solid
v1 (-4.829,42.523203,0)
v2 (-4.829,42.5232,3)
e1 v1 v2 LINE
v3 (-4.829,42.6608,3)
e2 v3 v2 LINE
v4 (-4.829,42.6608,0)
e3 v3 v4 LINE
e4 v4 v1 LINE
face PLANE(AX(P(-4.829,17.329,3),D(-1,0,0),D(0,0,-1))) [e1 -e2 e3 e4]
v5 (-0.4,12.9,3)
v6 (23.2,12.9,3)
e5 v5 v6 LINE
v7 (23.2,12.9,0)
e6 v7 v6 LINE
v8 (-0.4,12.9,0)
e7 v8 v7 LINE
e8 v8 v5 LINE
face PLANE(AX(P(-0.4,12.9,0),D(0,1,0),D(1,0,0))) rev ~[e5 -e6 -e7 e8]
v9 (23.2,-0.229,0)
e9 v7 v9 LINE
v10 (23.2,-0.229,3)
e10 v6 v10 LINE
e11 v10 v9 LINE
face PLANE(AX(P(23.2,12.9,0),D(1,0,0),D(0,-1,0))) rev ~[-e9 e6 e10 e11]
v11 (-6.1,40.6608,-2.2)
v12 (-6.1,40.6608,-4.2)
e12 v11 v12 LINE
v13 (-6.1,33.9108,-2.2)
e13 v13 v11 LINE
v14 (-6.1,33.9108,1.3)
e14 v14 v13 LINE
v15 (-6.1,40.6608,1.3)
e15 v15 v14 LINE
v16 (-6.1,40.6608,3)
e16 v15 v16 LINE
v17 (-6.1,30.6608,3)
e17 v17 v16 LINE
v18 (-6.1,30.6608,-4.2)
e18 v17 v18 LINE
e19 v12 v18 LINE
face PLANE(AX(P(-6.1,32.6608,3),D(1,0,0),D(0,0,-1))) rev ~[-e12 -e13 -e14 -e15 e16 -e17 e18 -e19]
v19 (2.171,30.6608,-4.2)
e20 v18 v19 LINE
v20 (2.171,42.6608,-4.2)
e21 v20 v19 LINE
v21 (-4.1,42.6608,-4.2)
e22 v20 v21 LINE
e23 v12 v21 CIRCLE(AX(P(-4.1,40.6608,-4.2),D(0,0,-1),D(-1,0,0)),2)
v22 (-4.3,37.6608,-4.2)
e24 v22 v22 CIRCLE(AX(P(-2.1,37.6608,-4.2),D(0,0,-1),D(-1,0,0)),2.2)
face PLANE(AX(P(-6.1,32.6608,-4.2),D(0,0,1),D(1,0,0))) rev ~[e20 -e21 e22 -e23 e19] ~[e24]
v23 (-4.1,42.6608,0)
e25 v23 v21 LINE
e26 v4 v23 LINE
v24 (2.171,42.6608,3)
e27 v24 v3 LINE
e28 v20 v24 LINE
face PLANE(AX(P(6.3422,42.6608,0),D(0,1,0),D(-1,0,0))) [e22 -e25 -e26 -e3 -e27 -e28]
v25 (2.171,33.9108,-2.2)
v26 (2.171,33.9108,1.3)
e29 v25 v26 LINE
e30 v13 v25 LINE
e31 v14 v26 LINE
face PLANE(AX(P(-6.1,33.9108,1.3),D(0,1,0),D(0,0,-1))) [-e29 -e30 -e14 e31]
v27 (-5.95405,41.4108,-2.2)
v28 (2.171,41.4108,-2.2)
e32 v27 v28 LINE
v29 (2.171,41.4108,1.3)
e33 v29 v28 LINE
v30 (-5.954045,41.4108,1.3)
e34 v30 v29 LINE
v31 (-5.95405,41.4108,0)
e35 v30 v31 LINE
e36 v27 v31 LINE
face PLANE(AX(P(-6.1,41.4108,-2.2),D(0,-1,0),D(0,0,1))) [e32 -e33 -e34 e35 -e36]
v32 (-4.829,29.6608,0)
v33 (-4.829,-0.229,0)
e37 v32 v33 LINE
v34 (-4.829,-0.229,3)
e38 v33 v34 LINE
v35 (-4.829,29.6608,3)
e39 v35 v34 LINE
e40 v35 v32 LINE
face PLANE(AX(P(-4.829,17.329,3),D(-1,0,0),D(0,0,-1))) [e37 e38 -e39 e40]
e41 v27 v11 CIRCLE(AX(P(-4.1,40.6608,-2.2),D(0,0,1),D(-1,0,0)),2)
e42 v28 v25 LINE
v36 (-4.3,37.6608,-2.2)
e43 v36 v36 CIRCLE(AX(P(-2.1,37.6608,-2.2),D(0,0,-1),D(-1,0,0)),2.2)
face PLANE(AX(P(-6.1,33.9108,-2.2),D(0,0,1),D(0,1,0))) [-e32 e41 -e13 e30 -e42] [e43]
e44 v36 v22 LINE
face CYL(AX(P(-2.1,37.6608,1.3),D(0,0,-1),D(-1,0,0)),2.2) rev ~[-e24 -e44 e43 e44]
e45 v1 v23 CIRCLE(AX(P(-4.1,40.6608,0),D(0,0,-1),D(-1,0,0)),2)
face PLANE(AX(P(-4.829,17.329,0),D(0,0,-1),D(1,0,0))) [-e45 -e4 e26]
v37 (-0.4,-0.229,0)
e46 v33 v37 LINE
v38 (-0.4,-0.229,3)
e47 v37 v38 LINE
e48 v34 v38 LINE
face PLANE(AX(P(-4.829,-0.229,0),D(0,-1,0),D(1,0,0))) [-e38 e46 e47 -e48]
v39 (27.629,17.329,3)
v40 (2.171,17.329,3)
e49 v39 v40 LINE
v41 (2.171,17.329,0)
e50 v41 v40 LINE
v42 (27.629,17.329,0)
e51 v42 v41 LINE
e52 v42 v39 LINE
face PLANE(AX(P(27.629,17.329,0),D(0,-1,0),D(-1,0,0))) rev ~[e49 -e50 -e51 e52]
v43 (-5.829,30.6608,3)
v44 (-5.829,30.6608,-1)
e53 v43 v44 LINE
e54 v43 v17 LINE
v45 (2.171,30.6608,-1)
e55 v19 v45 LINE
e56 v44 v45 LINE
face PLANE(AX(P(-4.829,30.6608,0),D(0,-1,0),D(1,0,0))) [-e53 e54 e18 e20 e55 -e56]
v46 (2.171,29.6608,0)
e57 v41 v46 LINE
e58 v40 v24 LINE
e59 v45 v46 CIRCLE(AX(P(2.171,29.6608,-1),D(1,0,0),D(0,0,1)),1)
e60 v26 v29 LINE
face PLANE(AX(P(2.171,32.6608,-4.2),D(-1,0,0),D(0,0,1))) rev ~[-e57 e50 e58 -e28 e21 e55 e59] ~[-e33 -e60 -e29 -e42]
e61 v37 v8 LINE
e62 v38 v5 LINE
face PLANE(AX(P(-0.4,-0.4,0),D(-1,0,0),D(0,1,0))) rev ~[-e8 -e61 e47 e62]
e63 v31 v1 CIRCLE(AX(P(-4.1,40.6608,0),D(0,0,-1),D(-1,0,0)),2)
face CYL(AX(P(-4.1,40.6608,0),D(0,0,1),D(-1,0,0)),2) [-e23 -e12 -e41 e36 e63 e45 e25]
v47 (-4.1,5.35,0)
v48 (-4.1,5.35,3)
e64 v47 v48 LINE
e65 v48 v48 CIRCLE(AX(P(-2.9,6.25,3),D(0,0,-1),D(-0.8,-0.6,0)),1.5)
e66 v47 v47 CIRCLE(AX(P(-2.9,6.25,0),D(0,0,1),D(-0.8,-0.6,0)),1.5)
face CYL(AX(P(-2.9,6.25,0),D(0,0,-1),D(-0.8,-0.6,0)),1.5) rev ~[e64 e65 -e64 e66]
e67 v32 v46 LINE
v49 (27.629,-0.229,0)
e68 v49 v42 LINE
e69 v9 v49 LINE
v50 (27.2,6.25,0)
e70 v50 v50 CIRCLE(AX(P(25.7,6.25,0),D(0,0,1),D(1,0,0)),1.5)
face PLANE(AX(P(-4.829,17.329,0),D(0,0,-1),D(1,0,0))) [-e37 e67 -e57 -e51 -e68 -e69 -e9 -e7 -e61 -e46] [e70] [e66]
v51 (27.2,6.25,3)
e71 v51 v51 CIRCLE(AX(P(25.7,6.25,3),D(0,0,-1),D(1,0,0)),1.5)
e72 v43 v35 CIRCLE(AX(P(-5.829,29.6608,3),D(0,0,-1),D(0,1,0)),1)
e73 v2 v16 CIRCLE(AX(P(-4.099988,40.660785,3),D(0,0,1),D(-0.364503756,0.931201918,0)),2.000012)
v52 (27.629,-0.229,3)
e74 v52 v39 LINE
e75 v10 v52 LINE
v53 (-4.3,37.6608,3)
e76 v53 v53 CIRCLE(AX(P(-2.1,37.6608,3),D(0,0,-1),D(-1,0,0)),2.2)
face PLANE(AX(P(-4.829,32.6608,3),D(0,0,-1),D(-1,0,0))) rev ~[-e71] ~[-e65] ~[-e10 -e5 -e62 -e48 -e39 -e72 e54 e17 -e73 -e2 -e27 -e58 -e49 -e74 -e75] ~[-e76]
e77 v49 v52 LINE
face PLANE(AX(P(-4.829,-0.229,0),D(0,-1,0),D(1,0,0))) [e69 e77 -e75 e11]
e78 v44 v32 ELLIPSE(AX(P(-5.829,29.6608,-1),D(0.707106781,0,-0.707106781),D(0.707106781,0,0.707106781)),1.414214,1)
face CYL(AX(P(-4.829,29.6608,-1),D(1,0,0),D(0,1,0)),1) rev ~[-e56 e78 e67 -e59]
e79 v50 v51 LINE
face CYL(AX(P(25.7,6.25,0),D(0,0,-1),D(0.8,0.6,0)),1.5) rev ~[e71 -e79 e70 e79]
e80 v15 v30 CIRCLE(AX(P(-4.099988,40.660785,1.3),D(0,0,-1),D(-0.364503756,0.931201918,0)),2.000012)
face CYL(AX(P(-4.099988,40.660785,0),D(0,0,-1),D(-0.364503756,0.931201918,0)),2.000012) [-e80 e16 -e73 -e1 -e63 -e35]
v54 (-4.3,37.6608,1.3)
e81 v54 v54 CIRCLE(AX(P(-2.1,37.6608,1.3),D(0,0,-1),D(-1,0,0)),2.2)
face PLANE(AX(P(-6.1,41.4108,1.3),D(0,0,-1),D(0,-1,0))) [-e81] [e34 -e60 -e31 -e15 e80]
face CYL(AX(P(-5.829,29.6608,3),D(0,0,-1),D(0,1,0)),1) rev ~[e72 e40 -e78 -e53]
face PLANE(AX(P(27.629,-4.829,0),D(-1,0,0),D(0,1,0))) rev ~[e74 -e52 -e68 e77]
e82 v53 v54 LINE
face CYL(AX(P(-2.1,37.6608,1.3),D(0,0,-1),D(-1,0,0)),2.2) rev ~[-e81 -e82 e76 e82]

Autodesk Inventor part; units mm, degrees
ref_plane "YZ Plane" through (0, 0, 0) normal (1, 0, 0) x (0, 1, 0)
ref_plane "XZ Plane" through (0, 0, 0) normal (0, 1, 0) x (-1, 0, 0)
sketch "Sketch1" plane through (0, 0, 0) normal (0, 0, 1) x (1, 0, 0)
  line L0 (22.8, 0) -> (0, 0) projected
  line L1 (22.8, 12.5) -> (22.8, 0) projected
  line L2 (0, 12.5) -> (22.8, 12.5) projected
  line L3 (0, 0) -> (0, 12.5) projected
  arc A0 (-3.7, 5.65) -> (-3.7, 6.85) centre (-2.9, 6.25) ccw projected
  arc A1 (26.5, 6.85) -> (26.5, 5.65) centre (25.7, 6.25) ccw projected
  line L4 (23.2, 12.9) -> (23.2, -0.4)
  line L5 (23.2, -0.4) -> (-0.4, -0.4)
  line L6 (-0.4, -0.4) -> (-0.4, 12.9)
  line L7 (-0.4, 12.9) -> (23.2, 12.9)
  line L8 (27.6, 6.85) -> (27.6, 12.5) construction
  line L9 (27.629, -4.829) -> (27.629, 17.329)
  line L10 (27.629, 17.329) -> (-4.829, 17.329)
  line L11 (-4.829, 17.329) -> (-4.829, -4.829)
  line L12 (-4.829, -4.829) -> (27.629, -4.829)
  arc A2 (-4.1, 5.35) -> (-4.1, 7.15) centre (-2.9, 6.25) ccw
  arc A3 (26.9, 7.15) -> (26.9, 5.35) centre (25.7, 6.25) ccw
  circle A4 centre (-2.9, 6.25) radius 1.5
  circle A5 centre (25.7, 6.25) radius 1.5
  dimension "d0" = 0.4
  dimension "d1" = 0.5
  dimension "d2" = 0.5
extrude "Extrusion1" add sketch "Sketch1" along normal blind 3 contours L12 L11 L10 L9
sketch "Sketch2" plane through (-4.829, -4.829, 0) normal (0, -1, 0) x (1, 0, 0)
  line L0 (0, 0) -> (32.458, 0) projected
  line L1 (32.458, 0) -> (32.458, 3) projected
  line L2 (0, 3) -> (32.458, 3) projected
  line L3 (0, 0) -> (0, 3) projected
  point P0 (4.829, 0)
extrude "Extrusion2" cut sketch "Sketch2" against normal blind 4.6
sketch "Sketch3" plane through (-4.829, 17.329, 0) normal (0, 1, 0) x (1, 0, 0)
  line L0 (32.458, -3) -> (0, -3) projected
  line L1 (0, 0) -> (7, 0)
  line L2 (7, 0) -> (7, -3)
  line L3 (7, -3) -> (0, -3)
  line L4 (0, -3) -> (0, 0)
  point P0 (4.829, 0)
  dimension "d7" = 7
ref_plane "Work Plane1" through (-4.1, 42.6608, -9.2) normal (0, 1, 0) x (0, 0, 1)
extrude "Extrusion3" add sketch "Sketch3" along normal up to surface (25.3318 mm away)
sketch "Sketch4" plane through (0, 0, 0) normal (0, 0, -1) x (-1, 0, 0)
  circle A0 centre (2.1, 37.6608) radius 2 projected
  line L0 (-1.9, 39.6608) -> (-1.9, 32.6608) projected
  line L1 (-6.3422, 39.6608) -> (-1.9, 39.6608) projected
  line L2 (-6.3422, 39.6608) -> (-6.3422, 42.6608) projected
  line L3 (-6.3422, 42.6608) -> (4.1, 42.6608) projected
  arc A1 (6.1, 40.6608) -> (4.1, 42.6608) centre (4.1, 40.6608) ccw projected
  line L4 (6.1, 32.6608) -> (6.1, 40.6608) projected
  line L5 (-1.9, 32.6608) -> (6.1, 32.6608) projected
  point P0 (0, 0)
extrude "Extrusion4" add sketch "Sketch4" along normal up to surface (4.2 mm away)
sketch "Sketch5" plane through (0, 0, 0) normal (0, 0, 1) x (1, 0, 0)
  line L0 (2.171, 39.6608) -> (2.171, 42.6608) projected
  line L1 (6.3422, 39.6608) -> (2.171, 39.6608) projected
  line L2 (6.3422, 42.6608) -> (6.3422, 39.6608) projected
  line L3 (2.171, 42.6608) -> (6.3422, 42.6608) projected
  point P0 (0, 0)
extrude "Extrusion5" cut sketch "Sketch5" against normal up to surface (4.2 mm away)
sketch "Sketch6" plane through (0, 0, 0) normal (0, 0, 1) x (1, 0, 0)
  line L0 (-4.829, 32.6608) -> (-4.829, 42.5232) projected
  arc A0 (-4.829, 42.5232) -> (-6.1, 40.6608) centre (-4.1, 40.6608) ccw projected
  line L1 (-6.1, 32.6608) -> (-6.1, 40.6608) projected
  line L2 (-4.829, 32.6608) -> (-6.1, 32.6608) projected
  point P0 (0, 0)
extrude "Extrusion6" add sketch "Sketch6" along normal up to surface (3 mm away)
sketch "Sketch7" plane through (1.9, 32.6608, 0) normal (1, 0, 0) x (0, 0, -1)
  line L0 (4.2, 0) -> (4.2, 7) projected
  line L1 (0, 7) -> (4.2, 7) projected
  line L2 (0, 0) -> (0, 7) projected
  line L3 (0, 0) -> (4.2, 0) projected
  point P0 (0, -32.6608)
extrude "Extrusion7" add sketch "Sketch7" along normal up to surface (0.271 mm away)
sketch "Sketch8" plane through (-6.1, 32.6608, -4.2) normal (-1, 0, 0) x (0, 0, 1)
  line L0 (2, 8.75) -> (5.5, 8.75)
  line L1 (5.5, 8.75) -> (5.5, 1.25)
  line L2 (5.5, 1.25) -> (2, 1.25)
  line L3 (2, 1.25) -> (2, 8.75)
  line L4 (0, 7) -> (0, 3) construction
  line L5 (0, 7) -> (0, 3) construction
  line L6 (4.2, 7) -> (4.2, 3) construction
  line L7 (4.2, 7) -> (0, 7) construction
  line L8 (4.2, 3) -> (0, 3) construction
  point P0 (4.2, -32.6608)
  dimension "d19" = 3.5
  dimension "d20" = 7.5
  dimension "d21" = 1.75
  dimension "d22" = 2
extrude "Extrusion8" cut sketch "Sketch8" against normal through all
sketch "Sketch9" plane through (-6.1, 33.9108, 1.3) normal (0, 0, -1) x (-1, 0, 0)
  circle A0 centre (-4, 3.75) radius 2 projected
  circle A1 centre (-4, 3.75) radius 2.2
  point P0 (-6.1, -33.9108)
  dimension "d25" = 0.2
extrude "Extrusion9" cut sketch "Sketch9" along normal through all both and the other way through all contours A0 | A1
sketch "Sketch10" plane through (-4.829, 32.6608, 0) normal (0, -1, 0) x (1, 0, 0)
  line L0 (-1.271, -4.2) -> (7, -4.2) projected
  line L1 (7, -4.2) -> (7, 0) projected
  line L2 (0, 0) -> (7, 0) projected
  line L3 (0, 3) -> (0, 0) projected
  line L4 (0, 3) -> (-1.271, 3) projected
  line L5 (-1.271, 3) -> (-1.271, -4.2) projected
  point P0 (4.829, 0)
extrude "Extrusion10" add sketch "Sketch10" along normal blind 2
fillet "Fillet2" radius 1 2 edges at (-1.329, 30.6608, 0) (-4.829, 30.6608, 1.5)
properties part number "ServoBracket"
